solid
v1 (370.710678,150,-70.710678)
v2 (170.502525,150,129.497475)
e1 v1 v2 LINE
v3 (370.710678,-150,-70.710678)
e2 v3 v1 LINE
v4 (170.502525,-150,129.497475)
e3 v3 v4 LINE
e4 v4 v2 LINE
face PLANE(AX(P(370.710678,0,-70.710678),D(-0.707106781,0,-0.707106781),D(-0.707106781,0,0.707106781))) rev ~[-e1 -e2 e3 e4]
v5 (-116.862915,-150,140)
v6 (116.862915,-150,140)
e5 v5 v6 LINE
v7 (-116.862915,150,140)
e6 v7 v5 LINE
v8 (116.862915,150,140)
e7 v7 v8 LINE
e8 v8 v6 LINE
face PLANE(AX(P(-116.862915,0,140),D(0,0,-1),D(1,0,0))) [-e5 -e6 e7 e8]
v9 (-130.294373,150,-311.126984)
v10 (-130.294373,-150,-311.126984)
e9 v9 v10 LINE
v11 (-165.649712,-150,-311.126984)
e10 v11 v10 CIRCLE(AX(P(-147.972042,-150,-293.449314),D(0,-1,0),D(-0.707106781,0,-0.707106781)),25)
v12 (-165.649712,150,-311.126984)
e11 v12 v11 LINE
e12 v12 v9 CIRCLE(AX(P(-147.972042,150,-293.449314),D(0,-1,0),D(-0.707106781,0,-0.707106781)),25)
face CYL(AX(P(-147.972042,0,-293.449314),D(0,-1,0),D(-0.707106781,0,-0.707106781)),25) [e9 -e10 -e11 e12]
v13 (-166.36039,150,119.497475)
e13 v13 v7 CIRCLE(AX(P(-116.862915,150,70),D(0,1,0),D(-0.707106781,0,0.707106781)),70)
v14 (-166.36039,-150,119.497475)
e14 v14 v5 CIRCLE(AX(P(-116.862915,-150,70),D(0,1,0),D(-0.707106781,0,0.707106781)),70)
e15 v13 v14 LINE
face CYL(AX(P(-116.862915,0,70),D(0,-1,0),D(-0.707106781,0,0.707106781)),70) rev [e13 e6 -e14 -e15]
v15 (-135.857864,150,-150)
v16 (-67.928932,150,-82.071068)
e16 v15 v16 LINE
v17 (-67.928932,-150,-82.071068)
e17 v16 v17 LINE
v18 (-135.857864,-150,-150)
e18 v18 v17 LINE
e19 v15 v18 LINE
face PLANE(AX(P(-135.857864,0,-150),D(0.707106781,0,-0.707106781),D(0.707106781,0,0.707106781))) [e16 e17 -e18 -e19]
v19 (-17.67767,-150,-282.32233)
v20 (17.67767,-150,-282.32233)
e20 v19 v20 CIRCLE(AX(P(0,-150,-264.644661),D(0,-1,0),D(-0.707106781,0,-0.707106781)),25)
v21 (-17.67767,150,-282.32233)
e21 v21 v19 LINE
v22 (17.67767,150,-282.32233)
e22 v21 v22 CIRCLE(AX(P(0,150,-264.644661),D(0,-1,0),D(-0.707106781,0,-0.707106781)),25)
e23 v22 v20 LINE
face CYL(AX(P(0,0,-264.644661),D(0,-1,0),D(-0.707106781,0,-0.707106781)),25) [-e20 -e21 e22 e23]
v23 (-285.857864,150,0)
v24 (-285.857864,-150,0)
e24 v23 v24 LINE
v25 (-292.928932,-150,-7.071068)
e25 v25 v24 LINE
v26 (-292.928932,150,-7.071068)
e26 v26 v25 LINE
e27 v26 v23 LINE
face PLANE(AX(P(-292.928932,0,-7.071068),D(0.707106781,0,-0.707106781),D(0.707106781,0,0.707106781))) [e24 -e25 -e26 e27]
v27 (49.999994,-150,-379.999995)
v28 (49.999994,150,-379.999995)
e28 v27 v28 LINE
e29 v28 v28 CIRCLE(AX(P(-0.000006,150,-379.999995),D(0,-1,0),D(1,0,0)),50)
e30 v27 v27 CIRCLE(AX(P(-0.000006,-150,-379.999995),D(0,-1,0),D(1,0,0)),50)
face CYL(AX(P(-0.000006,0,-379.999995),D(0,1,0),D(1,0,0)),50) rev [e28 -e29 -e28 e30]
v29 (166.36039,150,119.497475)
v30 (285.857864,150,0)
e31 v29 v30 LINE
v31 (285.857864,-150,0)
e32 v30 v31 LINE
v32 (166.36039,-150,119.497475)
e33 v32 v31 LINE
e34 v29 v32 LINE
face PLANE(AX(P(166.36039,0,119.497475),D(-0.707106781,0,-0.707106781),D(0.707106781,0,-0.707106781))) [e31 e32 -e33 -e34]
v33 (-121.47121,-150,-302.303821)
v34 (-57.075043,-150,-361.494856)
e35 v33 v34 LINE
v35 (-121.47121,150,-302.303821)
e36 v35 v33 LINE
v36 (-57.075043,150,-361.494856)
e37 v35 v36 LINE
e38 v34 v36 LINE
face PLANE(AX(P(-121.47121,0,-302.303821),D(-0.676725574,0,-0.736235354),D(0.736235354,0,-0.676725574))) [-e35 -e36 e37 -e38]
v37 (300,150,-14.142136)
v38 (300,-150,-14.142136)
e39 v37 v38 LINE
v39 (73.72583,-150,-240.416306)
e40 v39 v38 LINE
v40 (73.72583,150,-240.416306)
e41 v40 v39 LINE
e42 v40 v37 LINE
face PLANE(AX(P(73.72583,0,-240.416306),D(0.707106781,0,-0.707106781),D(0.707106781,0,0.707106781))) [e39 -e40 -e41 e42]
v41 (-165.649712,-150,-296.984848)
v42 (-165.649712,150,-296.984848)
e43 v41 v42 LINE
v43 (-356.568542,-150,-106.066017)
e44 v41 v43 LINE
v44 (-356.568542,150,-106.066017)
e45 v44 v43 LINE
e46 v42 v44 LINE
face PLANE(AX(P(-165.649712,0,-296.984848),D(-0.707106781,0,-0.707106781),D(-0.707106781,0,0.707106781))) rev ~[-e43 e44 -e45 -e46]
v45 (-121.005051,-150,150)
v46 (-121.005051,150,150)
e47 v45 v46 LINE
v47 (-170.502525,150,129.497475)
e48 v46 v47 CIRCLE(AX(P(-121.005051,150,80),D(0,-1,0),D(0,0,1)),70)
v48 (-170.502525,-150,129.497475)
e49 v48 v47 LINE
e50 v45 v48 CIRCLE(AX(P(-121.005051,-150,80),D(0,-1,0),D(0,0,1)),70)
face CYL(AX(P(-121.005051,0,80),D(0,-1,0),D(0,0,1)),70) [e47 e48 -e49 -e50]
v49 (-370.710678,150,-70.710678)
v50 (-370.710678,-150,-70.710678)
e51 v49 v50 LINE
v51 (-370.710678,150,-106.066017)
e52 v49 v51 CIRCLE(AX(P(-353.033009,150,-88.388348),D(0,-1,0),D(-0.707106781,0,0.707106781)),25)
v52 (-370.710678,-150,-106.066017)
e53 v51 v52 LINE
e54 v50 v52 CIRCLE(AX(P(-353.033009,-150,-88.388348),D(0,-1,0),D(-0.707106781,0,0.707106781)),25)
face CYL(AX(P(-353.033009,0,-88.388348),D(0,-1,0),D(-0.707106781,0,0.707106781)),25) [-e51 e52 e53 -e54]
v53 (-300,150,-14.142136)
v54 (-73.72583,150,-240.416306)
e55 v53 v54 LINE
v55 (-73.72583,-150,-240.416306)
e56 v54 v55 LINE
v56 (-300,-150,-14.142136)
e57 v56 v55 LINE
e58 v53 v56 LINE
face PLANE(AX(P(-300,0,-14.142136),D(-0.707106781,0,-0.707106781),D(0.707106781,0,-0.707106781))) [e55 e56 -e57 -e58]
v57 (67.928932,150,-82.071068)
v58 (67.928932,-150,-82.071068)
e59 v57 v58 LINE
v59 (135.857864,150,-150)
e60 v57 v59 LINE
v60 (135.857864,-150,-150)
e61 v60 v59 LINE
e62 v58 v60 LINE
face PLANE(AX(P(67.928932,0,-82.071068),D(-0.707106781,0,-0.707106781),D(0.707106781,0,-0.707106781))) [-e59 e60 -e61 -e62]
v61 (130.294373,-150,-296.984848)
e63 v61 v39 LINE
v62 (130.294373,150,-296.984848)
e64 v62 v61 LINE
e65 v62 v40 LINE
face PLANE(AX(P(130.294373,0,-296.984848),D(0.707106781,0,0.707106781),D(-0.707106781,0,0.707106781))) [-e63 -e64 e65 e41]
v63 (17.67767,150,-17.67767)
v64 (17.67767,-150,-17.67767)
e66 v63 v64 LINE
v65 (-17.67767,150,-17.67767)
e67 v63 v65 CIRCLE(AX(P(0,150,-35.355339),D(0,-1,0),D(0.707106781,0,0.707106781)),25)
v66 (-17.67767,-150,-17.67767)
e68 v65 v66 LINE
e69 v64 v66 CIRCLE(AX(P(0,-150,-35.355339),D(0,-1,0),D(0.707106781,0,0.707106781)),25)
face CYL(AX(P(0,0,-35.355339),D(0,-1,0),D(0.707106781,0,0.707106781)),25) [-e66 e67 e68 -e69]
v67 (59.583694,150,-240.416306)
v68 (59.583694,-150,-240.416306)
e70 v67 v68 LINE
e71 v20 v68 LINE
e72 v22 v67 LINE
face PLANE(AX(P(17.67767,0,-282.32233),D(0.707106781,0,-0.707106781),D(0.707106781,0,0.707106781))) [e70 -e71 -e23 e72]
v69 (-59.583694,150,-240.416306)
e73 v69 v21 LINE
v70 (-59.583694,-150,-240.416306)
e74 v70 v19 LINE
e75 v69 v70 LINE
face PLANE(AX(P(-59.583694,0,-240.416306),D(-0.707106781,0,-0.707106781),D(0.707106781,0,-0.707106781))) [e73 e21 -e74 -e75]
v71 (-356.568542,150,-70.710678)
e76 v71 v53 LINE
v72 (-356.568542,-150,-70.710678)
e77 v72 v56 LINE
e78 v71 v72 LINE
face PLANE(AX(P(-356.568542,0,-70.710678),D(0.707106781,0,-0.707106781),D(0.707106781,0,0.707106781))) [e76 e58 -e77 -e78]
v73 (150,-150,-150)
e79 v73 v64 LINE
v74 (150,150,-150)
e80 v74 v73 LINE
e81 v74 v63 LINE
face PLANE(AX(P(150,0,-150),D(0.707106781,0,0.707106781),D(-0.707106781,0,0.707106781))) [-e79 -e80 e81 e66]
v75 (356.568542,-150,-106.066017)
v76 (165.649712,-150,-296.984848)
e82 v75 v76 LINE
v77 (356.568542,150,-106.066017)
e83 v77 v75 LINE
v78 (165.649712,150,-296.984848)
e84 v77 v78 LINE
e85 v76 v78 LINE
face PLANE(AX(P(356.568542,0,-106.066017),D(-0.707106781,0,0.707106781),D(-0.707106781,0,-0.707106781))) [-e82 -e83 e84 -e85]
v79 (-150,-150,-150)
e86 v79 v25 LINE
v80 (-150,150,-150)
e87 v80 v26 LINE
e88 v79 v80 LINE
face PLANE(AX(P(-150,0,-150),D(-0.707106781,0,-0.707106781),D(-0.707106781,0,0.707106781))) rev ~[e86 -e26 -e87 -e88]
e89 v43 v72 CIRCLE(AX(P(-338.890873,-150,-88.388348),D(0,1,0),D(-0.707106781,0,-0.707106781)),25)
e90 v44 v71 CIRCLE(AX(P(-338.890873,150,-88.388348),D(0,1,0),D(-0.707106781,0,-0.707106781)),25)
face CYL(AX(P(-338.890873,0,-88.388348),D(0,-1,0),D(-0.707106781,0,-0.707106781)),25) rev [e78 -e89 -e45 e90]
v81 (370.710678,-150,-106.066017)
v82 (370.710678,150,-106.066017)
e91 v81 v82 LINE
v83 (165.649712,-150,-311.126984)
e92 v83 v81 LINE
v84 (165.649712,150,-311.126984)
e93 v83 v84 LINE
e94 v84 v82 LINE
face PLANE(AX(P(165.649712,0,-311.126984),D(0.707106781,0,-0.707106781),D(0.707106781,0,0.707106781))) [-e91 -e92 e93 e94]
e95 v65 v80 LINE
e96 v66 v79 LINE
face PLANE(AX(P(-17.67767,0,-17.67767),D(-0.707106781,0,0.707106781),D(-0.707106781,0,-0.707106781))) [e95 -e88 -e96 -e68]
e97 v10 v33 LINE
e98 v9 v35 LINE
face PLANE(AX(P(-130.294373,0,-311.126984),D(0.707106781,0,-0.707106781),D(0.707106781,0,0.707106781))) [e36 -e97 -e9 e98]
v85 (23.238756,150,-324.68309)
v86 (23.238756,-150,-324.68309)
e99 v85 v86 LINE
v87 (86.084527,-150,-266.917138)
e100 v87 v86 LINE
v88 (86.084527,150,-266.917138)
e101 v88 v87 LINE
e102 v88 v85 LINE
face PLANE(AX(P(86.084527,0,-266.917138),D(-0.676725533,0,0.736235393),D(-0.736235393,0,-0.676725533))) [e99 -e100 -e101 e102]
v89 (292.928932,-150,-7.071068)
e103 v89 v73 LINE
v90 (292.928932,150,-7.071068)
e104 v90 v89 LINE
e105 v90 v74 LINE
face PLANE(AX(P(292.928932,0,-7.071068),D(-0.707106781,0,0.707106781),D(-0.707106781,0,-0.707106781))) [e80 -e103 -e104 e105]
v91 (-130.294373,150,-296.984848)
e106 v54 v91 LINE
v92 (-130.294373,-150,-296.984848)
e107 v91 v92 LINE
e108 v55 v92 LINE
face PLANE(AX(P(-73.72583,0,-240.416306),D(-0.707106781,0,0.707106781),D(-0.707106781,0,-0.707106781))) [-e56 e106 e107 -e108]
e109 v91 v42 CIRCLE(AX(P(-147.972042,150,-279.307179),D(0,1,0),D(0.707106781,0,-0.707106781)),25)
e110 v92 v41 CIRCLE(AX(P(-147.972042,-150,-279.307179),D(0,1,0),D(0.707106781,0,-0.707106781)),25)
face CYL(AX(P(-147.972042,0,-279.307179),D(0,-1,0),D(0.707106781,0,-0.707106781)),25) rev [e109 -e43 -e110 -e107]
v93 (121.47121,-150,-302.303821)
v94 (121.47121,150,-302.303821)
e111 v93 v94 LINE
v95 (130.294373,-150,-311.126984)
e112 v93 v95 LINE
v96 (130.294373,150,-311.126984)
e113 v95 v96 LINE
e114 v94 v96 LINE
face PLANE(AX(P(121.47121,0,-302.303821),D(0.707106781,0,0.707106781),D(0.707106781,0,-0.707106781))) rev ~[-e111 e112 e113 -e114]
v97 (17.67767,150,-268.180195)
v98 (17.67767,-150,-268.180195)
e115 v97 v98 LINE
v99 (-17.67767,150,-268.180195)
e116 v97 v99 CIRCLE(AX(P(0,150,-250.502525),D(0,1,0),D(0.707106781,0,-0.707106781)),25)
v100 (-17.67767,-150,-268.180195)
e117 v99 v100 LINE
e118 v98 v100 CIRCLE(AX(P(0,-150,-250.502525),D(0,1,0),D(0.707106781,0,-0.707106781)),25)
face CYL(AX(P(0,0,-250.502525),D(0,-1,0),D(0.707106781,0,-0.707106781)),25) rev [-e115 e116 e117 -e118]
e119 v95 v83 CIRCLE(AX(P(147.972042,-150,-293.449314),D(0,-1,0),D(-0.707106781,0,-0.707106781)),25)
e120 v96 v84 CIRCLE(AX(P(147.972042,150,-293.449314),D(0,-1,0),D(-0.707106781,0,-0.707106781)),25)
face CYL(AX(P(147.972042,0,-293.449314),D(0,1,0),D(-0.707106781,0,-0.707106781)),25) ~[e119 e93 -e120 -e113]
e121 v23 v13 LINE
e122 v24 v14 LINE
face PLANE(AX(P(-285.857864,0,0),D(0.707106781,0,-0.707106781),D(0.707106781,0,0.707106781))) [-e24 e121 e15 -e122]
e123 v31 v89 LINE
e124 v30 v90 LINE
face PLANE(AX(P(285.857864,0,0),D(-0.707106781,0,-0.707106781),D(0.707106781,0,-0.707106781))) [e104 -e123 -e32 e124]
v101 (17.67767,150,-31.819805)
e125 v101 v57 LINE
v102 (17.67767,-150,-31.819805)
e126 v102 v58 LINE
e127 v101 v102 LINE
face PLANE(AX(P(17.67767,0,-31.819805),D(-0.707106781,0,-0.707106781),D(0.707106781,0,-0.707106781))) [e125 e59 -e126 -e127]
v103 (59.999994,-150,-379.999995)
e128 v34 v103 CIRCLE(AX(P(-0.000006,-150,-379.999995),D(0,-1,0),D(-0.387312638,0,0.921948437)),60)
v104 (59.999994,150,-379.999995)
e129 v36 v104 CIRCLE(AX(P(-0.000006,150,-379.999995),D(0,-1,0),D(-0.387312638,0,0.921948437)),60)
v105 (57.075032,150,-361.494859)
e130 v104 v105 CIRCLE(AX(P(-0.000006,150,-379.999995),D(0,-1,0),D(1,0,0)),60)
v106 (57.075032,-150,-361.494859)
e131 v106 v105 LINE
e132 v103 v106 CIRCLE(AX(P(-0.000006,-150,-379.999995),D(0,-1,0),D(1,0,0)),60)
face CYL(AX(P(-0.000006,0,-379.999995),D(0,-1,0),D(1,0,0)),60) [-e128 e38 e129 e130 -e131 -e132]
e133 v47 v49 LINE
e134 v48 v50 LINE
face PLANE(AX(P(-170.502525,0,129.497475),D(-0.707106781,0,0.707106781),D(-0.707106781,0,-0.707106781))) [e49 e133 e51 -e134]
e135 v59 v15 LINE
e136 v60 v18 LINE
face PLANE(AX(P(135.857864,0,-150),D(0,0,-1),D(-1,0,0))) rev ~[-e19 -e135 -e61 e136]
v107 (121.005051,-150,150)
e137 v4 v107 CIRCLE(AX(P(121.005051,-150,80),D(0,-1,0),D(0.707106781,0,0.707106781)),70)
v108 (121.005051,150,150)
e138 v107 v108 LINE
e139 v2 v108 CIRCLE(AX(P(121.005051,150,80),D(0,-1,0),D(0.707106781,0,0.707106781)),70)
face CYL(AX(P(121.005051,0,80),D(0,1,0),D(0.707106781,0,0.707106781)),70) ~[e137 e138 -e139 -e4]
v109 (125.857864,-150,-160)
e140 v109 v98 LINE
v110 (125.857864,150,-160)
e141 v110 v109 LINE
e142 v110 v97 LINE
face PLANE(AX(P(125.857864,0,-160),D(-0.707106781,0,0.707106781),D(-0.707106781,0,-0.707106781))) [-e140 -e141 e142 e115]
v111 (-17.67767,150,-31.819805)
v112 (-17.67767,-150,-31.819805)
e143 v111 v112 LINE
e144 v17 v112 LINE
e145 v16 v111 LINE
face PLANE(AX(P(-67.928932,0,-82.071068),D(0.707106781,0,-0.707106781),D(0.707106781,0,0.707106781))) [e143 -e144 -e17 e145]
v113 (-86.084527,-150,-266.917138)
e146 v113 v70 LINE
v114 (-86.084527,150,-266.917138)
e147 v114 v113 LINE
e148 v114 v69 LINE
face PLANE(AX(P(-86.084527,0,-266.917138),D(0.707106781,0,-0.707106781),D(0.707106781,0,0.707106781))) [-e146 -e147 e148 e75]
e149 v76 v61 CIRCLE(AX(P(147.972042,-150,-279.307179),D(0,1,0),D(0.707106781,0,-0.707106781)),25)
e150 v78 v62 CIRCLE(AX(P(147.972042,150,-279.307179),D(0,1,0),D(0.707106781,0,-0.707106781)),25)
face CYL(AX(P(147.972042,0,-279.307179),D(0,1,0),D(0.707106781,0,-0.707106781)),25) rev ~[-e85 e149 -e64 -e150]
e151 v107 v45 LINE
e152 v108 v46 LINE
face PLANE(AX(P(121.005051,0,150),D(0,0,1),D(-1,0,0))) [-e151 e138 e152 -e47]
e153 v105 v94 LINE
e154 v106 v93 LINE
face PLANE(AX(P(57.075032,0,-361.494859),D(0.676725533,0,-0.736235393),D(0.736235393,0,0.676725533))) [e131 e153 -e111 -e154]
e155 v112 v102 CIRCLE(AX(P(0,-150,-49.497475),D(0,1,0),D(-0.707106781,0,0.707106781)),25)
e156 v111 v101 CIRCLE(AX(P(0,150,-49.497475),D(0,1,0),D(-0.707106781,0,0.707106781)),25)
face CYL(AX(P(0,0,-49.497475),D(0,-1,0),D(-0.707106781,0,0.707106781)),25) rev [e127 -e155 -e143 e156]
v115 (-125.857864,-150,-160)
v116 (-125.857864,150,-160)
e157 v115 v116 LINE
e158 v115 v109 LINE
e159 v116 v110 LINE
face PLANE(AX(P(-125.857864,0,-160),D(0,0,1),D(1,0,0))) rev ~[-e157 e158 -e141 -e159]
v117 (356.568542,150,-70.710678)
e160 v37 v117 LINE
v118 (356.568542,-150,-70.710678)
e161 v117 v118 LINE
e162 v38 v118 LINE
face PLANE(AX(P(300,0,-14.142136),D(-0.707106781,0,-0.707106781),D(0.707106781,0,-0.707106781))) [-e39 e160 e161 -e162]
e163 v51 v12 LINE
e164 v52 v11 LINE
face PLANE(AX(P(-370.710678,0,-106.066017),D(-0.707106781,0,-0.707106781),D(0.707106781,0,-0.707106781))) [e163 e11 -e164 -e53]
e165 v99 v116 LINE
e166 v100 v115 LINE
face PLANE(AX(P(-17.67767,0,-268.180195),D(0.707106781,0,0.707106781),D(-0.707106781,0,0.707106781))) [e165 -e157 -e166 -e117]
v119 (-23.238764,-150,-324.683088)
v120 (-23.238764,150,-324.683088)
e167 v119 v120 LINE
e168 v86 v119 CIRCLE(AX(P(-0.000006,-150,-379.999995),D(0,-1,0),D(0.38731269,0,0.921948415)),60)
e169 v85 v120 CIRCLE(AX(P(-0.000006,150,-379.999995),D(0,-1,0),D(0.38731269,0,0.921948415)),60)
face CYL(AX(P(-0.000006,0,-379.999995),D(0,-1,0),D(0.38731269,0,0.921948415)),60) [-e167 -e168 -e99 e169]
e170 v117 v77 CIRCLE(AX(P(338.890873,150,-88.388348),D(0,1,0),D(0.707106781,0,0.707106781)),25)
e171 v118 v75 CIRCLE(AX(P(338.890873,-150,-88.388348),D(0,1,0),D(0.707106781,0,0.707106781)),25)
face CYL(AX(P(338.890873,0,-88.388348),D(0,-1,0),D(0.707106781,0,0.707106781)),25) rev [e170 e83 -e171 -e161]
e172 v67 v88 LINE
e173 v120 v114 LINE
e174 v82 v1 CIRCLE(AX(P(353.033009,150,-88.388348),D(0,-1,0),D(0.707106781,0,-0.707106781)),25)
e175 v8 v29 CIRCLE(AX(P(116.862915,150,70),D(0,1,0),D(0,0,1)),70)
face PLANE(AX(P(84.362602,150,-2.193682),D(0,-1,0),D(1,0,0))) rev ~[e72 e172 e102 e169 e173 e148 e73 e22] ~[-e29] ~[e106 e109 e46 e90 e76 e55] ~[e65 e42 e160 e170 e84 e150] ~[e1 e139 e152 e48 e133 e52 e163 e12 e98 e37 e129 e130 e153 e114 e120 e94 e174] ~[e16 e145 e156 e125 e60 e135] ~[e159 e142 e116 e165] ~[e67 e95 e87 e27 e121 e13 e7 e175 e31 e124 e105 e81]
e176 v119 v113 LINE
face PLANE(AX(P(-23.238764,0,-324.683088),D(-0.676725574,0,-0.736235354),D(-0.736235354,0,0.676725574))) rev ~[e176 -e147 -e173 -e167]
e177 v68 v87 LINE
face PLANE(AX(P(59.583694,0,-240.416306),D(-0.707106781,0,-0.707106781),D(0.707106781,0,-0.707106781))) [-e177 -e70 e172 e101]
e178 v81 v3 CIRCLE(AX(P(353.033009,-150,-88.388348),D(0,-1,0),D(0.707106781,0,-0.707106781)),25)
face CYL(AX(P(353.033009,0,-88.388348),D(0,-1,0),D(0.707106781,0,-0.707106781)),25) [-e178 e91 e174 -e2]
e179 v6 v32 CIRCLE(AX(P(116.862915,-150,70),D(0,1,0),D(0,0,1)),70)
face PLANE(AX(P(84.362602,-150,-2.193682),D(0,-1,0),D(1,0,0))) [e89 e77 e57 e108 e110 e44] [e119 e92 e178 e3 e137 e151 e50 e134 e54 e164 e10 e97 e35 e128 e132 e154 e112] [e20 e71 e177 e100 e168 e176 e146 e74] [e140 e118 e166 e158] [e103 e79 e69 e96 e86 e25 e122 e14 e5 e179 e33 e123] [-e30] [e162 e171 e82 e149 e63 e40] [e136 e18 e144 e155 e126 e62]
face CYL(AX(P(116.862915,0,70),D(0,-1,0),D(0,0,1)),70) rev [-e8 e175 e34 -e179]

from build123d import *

# Parameters (mm, degrees)
F0_R     = 50
F1_DEPTH = 150


# Not quite as in the source:
# - a feature names something its author has since deleted; it is built from what else it names


with BuildPart() as f1:
    # F0 (on Front) → F1 (new body, symmetric)
    with BuildSketch(Plane.XZ):
        with BuildLine():
            Line((-170.5025253169, 129.4974746831), (-300, 0))
            Line((-300, 0), (-292.9289321881, -7.0710678119))
            Line((-292.9289321881, -7.0710678119), (-285.8578643763, 0))
            Line((-285.8578643763, 0), (-166.3603896932, 119.4974746831))
            ThreePointArc((-166.3603896932, 119.4974746831), (-143.6507552757, 134.6715672758), (-116.8629150102, 140))
            Line((-116.8629150102, 140), (116.8629150102, 140))
            ThreePointArc((116.8629150102, 140), (143.6507552757, 134.6715672758), (166.3603896932, 119.4974746831))
            Line((166.3603896932, 119.4974746831), (285.8578643763, 0))
            Line((285.8578643763, 0), (292.9289321881, -7.0710678119))
            Line((292.9289321881, -7.0710678119), (150, -150))
            Line((150, -150), (59.5836943966, -240.4163056034))
            Line((59.5836943966, -240.4163056034), (86.0845268471, -266.917138054))
            Line((86.0845268471, -266.917138054), (121.4712095943, -302.3038208012))
            Line((121.4712095943, -302.3038208012), (130.2943725152, -311.1269837221))
            ThreePointArc((130.2943725152, -311.1269837221), (147.9720420449, -318.4493141924), (165.6497115746, -311.1269837221))
            Line((165.6497115746, -311.1269837221), (370.7106781187, -106.066017178))
            ThreePointArc((370.7106781187, -106.066017178), (378.033008589, -88.3883476483), (370.7106781187, -70.7106781187))
            Line((370.7106781187, -70.7106781187), (300, 0))
            Line((300, 0), (170.5025253169, 129.4974746831))
            ThreePointArc((170.5025253169, 129.4974746831), (147.7928908994, 144.6715672758), (121.0050506339, 150))
            Line((121.0050506339, 150), (-121.0050506339, 150))
            ThreePointArc((-121.0050506339, 150), (-147.7928908994, 144.6715672758), (-170.5025253169, 129.4974746831))
        make_face()
        with BuildLine():
            Line((73.7258300203, -240.4163056034), (300, -14.1421356237))
            Line((300, -14.1421356237), (356.5685424949, -70.7106781187))
            ThreePointArc((356.5685424949, -70.7106781187), (363.8908729653, -88.3883476483), (356.5685424949, -106.066017178))
            Line((356.5685424949, -106.066017178), (165.6497115746, -296.9848480984))
            ThreePointArc((165.6497115746, -296.9848480984), (147.9720420449, -304.3071785687), (130.2943725152, -296.9848480984))
            Line((130.2943725152, -296.9848480984), (73.7258300203, -240.4163056034))
        make_face(mode=Mode.SUBTRACT)
        with BuildLine():
            Line((-17.6776695297, -17.6776695297), (-150, -150))
            Line((-150, -150), (-59.5836943966, -240.4163056034))
            Line((-59.5836943966, -240.4163056034), (-17.6776695297, -282.3223304703))
            ThreePointArc((-17.6776695297, -282.3223304703), (0, -289.6446609407), (17.6776695297, -282.3223304703))
            Line((17.6776695297, -282.3223304703), (59.5836943966, -240.4163056034))
            Line((59.5836943966, -240.4163056034), (150, -150))
            Line((150, -150), (17.6776695297, -17.6776695297))
            ThreePointArc((17.6776695297, -17.6776695297), (0, -10.3553390593), (-17.6776695297, -17.6776695297))
        make_face()
        with BuildLine():
            ThreePointArc((17.6776695297, -268.1801948466), (0, -275.5025253169), (-17.6776695297, -268.1801948466))
            Line((-17.6776695297, -268.1801948466), (-125.8578643763, -160))
            Line((-125.8578643763, -160), (-135.8578643763, -150))
            Line((-135.8578643763, -150), (-67.9289321881, -82.0710678119))
            Line((-67.9289321881, -82.0710678119), (-17.6776695297, -31.8198051534))
            ThreePointArc((-17.6776695297, -31.8198051534), (0, -24.4974746831), (17.6776695297, -31.8198051534))
            Line((17.6776695297, -31.8198051534), (67.9289321881, -82.0710678119))
            Line((67.9289321881, -82.0710678119), (135.8578643763, -150))
            Line((135.8578643763, -150), (125.8578643763, -160))
            Line((125.8578643763, -160), (17.6776695297, -268.1801948466))
        make_face(mode=Mode.SUBTRACT)
        with BuildLine():
            Line((-292.9289321881, -7.0710678119), (-300, 0))
            Line((-300, 0), (-370.7106781187, -70.7106781187))
            ThreePointArc((-370.7106781187, -70.7106781187), (-378.033008589, -88.3883476483), (-370.7106781187, -106.066017178))
            Line((-370.7106781187, -106.066017178), (-165.6497115746, -311.1269837221))
            ThreePointArc((-165.6497115746, -311.1269837221), (-147.9720420449, -318.4493141924), (-130.2943725152, -311.1269837221))
            Line((-130.2943725152, -311.1269837221), (-121.4712095523, -302.3038207591))
            Line((-121.4712095523, -302.3038207591), (-86.0845268892, -266.917138096))
            Line((-86.0845268892, -266.917138096), (-59.5836943966, -240.4163056034))
            Line((-59.5836943966, -240.4163056034), (-150, -150))
            Line((-150, -150), (-292.9289321881, -7.0710678119))
        make_face()
        with BuildLine():
            Line((-356.5685424949, -70.7106781187), (-300, -14.1421356237))
            Line((-300, -14.1421356237), (-73.7258300203, -240.4163056034))
            Line((-73.7258300203, -240.4163056034), (-130.2943725152, -296.9848480984))
            ThreePointArc((-130.2943725152, -296.9848480984), (-147.9720420449, -304.3071785687), (-165.6497115746, -296.9848480984))
            Line((-165.6497115746, -296.9848480984), (-356.5685424949, -106.066017178))
            ThreePointArc((-356.5685424949, -106.066017178), (-363.8908729653, -88.3883476483), (-356.5685424949, -70.7106781187))
        make_face(mode=Mode.SUBTRACT)
        with BuildLine():
            ThreePointArc((23.2387555319, -324.683089695), (-4.1825e-06, -319.9999946001), (-23.238764161, -324.6830883841))
            ThreePointArc((-23.238764161, -324.6830883841), (-44.1741271353, -339.3964601375), (-57.0750428799, -361.4948561013))
            ThreePointArc((-57.0750428799, -361.4948561013), (-9.3674436165, -439.2642427617), (59.9999941253, -379.9999946001))
            ThreePointArc((59.9999941253, -379.9999946001), (59.264242551, -370.6325585299), (57.0750321743, -361.4948593208))
            ThreePointArc((57.0750321743, -361.4948593208), (44.1741176762, -339.3964626293), (23.2387555319, -324.683089695))
        make_face()
        with Locations((-5.8747e-06, -379.9999946001)):
            Circle(F0_R, mode=Mode.SUBTRACT)
        with BuildLine():
            Line((86.0845268471, -266.917138054), (23.2387555319, -324.683089695))
            ThreePointArc((23.2387555319, -324.683089695), (44.1741176762, -339.3964626293), (57.0750321743, -361.4948593208))
            Line((57.0750321743, -361.4948593208), (121.4712095943, -302.3038208012))
            Line((121.4712095943, -302.3038208012), (86.0845268471, -266.917138054))
        make_face()
        with BuildLine():
            Line((-23.238764161, -324.6830883841), (-86.0845268892, -266.917138096))
            Line((-86.0845268892, -266.917138096), (-121.4712095523, -302.3038207591))
            Line((-121.4712095523, -302.3038207591), (-57.0750428799, -361.4948561013))
            ThreePointArc((-57.0750428799, -361.4948561013), (-44.1741271353, -339.3964601375), (-23.238764161, -324.6830883841))
        make_face()
        Polygon((-135.8578643763, -150), (-125.8578643763, -160), (125.8578643763, -160), (135.8578643763, -150), align=None)
    extrude(amount=F1_DEPTH, both=True)


solid = f1.part
